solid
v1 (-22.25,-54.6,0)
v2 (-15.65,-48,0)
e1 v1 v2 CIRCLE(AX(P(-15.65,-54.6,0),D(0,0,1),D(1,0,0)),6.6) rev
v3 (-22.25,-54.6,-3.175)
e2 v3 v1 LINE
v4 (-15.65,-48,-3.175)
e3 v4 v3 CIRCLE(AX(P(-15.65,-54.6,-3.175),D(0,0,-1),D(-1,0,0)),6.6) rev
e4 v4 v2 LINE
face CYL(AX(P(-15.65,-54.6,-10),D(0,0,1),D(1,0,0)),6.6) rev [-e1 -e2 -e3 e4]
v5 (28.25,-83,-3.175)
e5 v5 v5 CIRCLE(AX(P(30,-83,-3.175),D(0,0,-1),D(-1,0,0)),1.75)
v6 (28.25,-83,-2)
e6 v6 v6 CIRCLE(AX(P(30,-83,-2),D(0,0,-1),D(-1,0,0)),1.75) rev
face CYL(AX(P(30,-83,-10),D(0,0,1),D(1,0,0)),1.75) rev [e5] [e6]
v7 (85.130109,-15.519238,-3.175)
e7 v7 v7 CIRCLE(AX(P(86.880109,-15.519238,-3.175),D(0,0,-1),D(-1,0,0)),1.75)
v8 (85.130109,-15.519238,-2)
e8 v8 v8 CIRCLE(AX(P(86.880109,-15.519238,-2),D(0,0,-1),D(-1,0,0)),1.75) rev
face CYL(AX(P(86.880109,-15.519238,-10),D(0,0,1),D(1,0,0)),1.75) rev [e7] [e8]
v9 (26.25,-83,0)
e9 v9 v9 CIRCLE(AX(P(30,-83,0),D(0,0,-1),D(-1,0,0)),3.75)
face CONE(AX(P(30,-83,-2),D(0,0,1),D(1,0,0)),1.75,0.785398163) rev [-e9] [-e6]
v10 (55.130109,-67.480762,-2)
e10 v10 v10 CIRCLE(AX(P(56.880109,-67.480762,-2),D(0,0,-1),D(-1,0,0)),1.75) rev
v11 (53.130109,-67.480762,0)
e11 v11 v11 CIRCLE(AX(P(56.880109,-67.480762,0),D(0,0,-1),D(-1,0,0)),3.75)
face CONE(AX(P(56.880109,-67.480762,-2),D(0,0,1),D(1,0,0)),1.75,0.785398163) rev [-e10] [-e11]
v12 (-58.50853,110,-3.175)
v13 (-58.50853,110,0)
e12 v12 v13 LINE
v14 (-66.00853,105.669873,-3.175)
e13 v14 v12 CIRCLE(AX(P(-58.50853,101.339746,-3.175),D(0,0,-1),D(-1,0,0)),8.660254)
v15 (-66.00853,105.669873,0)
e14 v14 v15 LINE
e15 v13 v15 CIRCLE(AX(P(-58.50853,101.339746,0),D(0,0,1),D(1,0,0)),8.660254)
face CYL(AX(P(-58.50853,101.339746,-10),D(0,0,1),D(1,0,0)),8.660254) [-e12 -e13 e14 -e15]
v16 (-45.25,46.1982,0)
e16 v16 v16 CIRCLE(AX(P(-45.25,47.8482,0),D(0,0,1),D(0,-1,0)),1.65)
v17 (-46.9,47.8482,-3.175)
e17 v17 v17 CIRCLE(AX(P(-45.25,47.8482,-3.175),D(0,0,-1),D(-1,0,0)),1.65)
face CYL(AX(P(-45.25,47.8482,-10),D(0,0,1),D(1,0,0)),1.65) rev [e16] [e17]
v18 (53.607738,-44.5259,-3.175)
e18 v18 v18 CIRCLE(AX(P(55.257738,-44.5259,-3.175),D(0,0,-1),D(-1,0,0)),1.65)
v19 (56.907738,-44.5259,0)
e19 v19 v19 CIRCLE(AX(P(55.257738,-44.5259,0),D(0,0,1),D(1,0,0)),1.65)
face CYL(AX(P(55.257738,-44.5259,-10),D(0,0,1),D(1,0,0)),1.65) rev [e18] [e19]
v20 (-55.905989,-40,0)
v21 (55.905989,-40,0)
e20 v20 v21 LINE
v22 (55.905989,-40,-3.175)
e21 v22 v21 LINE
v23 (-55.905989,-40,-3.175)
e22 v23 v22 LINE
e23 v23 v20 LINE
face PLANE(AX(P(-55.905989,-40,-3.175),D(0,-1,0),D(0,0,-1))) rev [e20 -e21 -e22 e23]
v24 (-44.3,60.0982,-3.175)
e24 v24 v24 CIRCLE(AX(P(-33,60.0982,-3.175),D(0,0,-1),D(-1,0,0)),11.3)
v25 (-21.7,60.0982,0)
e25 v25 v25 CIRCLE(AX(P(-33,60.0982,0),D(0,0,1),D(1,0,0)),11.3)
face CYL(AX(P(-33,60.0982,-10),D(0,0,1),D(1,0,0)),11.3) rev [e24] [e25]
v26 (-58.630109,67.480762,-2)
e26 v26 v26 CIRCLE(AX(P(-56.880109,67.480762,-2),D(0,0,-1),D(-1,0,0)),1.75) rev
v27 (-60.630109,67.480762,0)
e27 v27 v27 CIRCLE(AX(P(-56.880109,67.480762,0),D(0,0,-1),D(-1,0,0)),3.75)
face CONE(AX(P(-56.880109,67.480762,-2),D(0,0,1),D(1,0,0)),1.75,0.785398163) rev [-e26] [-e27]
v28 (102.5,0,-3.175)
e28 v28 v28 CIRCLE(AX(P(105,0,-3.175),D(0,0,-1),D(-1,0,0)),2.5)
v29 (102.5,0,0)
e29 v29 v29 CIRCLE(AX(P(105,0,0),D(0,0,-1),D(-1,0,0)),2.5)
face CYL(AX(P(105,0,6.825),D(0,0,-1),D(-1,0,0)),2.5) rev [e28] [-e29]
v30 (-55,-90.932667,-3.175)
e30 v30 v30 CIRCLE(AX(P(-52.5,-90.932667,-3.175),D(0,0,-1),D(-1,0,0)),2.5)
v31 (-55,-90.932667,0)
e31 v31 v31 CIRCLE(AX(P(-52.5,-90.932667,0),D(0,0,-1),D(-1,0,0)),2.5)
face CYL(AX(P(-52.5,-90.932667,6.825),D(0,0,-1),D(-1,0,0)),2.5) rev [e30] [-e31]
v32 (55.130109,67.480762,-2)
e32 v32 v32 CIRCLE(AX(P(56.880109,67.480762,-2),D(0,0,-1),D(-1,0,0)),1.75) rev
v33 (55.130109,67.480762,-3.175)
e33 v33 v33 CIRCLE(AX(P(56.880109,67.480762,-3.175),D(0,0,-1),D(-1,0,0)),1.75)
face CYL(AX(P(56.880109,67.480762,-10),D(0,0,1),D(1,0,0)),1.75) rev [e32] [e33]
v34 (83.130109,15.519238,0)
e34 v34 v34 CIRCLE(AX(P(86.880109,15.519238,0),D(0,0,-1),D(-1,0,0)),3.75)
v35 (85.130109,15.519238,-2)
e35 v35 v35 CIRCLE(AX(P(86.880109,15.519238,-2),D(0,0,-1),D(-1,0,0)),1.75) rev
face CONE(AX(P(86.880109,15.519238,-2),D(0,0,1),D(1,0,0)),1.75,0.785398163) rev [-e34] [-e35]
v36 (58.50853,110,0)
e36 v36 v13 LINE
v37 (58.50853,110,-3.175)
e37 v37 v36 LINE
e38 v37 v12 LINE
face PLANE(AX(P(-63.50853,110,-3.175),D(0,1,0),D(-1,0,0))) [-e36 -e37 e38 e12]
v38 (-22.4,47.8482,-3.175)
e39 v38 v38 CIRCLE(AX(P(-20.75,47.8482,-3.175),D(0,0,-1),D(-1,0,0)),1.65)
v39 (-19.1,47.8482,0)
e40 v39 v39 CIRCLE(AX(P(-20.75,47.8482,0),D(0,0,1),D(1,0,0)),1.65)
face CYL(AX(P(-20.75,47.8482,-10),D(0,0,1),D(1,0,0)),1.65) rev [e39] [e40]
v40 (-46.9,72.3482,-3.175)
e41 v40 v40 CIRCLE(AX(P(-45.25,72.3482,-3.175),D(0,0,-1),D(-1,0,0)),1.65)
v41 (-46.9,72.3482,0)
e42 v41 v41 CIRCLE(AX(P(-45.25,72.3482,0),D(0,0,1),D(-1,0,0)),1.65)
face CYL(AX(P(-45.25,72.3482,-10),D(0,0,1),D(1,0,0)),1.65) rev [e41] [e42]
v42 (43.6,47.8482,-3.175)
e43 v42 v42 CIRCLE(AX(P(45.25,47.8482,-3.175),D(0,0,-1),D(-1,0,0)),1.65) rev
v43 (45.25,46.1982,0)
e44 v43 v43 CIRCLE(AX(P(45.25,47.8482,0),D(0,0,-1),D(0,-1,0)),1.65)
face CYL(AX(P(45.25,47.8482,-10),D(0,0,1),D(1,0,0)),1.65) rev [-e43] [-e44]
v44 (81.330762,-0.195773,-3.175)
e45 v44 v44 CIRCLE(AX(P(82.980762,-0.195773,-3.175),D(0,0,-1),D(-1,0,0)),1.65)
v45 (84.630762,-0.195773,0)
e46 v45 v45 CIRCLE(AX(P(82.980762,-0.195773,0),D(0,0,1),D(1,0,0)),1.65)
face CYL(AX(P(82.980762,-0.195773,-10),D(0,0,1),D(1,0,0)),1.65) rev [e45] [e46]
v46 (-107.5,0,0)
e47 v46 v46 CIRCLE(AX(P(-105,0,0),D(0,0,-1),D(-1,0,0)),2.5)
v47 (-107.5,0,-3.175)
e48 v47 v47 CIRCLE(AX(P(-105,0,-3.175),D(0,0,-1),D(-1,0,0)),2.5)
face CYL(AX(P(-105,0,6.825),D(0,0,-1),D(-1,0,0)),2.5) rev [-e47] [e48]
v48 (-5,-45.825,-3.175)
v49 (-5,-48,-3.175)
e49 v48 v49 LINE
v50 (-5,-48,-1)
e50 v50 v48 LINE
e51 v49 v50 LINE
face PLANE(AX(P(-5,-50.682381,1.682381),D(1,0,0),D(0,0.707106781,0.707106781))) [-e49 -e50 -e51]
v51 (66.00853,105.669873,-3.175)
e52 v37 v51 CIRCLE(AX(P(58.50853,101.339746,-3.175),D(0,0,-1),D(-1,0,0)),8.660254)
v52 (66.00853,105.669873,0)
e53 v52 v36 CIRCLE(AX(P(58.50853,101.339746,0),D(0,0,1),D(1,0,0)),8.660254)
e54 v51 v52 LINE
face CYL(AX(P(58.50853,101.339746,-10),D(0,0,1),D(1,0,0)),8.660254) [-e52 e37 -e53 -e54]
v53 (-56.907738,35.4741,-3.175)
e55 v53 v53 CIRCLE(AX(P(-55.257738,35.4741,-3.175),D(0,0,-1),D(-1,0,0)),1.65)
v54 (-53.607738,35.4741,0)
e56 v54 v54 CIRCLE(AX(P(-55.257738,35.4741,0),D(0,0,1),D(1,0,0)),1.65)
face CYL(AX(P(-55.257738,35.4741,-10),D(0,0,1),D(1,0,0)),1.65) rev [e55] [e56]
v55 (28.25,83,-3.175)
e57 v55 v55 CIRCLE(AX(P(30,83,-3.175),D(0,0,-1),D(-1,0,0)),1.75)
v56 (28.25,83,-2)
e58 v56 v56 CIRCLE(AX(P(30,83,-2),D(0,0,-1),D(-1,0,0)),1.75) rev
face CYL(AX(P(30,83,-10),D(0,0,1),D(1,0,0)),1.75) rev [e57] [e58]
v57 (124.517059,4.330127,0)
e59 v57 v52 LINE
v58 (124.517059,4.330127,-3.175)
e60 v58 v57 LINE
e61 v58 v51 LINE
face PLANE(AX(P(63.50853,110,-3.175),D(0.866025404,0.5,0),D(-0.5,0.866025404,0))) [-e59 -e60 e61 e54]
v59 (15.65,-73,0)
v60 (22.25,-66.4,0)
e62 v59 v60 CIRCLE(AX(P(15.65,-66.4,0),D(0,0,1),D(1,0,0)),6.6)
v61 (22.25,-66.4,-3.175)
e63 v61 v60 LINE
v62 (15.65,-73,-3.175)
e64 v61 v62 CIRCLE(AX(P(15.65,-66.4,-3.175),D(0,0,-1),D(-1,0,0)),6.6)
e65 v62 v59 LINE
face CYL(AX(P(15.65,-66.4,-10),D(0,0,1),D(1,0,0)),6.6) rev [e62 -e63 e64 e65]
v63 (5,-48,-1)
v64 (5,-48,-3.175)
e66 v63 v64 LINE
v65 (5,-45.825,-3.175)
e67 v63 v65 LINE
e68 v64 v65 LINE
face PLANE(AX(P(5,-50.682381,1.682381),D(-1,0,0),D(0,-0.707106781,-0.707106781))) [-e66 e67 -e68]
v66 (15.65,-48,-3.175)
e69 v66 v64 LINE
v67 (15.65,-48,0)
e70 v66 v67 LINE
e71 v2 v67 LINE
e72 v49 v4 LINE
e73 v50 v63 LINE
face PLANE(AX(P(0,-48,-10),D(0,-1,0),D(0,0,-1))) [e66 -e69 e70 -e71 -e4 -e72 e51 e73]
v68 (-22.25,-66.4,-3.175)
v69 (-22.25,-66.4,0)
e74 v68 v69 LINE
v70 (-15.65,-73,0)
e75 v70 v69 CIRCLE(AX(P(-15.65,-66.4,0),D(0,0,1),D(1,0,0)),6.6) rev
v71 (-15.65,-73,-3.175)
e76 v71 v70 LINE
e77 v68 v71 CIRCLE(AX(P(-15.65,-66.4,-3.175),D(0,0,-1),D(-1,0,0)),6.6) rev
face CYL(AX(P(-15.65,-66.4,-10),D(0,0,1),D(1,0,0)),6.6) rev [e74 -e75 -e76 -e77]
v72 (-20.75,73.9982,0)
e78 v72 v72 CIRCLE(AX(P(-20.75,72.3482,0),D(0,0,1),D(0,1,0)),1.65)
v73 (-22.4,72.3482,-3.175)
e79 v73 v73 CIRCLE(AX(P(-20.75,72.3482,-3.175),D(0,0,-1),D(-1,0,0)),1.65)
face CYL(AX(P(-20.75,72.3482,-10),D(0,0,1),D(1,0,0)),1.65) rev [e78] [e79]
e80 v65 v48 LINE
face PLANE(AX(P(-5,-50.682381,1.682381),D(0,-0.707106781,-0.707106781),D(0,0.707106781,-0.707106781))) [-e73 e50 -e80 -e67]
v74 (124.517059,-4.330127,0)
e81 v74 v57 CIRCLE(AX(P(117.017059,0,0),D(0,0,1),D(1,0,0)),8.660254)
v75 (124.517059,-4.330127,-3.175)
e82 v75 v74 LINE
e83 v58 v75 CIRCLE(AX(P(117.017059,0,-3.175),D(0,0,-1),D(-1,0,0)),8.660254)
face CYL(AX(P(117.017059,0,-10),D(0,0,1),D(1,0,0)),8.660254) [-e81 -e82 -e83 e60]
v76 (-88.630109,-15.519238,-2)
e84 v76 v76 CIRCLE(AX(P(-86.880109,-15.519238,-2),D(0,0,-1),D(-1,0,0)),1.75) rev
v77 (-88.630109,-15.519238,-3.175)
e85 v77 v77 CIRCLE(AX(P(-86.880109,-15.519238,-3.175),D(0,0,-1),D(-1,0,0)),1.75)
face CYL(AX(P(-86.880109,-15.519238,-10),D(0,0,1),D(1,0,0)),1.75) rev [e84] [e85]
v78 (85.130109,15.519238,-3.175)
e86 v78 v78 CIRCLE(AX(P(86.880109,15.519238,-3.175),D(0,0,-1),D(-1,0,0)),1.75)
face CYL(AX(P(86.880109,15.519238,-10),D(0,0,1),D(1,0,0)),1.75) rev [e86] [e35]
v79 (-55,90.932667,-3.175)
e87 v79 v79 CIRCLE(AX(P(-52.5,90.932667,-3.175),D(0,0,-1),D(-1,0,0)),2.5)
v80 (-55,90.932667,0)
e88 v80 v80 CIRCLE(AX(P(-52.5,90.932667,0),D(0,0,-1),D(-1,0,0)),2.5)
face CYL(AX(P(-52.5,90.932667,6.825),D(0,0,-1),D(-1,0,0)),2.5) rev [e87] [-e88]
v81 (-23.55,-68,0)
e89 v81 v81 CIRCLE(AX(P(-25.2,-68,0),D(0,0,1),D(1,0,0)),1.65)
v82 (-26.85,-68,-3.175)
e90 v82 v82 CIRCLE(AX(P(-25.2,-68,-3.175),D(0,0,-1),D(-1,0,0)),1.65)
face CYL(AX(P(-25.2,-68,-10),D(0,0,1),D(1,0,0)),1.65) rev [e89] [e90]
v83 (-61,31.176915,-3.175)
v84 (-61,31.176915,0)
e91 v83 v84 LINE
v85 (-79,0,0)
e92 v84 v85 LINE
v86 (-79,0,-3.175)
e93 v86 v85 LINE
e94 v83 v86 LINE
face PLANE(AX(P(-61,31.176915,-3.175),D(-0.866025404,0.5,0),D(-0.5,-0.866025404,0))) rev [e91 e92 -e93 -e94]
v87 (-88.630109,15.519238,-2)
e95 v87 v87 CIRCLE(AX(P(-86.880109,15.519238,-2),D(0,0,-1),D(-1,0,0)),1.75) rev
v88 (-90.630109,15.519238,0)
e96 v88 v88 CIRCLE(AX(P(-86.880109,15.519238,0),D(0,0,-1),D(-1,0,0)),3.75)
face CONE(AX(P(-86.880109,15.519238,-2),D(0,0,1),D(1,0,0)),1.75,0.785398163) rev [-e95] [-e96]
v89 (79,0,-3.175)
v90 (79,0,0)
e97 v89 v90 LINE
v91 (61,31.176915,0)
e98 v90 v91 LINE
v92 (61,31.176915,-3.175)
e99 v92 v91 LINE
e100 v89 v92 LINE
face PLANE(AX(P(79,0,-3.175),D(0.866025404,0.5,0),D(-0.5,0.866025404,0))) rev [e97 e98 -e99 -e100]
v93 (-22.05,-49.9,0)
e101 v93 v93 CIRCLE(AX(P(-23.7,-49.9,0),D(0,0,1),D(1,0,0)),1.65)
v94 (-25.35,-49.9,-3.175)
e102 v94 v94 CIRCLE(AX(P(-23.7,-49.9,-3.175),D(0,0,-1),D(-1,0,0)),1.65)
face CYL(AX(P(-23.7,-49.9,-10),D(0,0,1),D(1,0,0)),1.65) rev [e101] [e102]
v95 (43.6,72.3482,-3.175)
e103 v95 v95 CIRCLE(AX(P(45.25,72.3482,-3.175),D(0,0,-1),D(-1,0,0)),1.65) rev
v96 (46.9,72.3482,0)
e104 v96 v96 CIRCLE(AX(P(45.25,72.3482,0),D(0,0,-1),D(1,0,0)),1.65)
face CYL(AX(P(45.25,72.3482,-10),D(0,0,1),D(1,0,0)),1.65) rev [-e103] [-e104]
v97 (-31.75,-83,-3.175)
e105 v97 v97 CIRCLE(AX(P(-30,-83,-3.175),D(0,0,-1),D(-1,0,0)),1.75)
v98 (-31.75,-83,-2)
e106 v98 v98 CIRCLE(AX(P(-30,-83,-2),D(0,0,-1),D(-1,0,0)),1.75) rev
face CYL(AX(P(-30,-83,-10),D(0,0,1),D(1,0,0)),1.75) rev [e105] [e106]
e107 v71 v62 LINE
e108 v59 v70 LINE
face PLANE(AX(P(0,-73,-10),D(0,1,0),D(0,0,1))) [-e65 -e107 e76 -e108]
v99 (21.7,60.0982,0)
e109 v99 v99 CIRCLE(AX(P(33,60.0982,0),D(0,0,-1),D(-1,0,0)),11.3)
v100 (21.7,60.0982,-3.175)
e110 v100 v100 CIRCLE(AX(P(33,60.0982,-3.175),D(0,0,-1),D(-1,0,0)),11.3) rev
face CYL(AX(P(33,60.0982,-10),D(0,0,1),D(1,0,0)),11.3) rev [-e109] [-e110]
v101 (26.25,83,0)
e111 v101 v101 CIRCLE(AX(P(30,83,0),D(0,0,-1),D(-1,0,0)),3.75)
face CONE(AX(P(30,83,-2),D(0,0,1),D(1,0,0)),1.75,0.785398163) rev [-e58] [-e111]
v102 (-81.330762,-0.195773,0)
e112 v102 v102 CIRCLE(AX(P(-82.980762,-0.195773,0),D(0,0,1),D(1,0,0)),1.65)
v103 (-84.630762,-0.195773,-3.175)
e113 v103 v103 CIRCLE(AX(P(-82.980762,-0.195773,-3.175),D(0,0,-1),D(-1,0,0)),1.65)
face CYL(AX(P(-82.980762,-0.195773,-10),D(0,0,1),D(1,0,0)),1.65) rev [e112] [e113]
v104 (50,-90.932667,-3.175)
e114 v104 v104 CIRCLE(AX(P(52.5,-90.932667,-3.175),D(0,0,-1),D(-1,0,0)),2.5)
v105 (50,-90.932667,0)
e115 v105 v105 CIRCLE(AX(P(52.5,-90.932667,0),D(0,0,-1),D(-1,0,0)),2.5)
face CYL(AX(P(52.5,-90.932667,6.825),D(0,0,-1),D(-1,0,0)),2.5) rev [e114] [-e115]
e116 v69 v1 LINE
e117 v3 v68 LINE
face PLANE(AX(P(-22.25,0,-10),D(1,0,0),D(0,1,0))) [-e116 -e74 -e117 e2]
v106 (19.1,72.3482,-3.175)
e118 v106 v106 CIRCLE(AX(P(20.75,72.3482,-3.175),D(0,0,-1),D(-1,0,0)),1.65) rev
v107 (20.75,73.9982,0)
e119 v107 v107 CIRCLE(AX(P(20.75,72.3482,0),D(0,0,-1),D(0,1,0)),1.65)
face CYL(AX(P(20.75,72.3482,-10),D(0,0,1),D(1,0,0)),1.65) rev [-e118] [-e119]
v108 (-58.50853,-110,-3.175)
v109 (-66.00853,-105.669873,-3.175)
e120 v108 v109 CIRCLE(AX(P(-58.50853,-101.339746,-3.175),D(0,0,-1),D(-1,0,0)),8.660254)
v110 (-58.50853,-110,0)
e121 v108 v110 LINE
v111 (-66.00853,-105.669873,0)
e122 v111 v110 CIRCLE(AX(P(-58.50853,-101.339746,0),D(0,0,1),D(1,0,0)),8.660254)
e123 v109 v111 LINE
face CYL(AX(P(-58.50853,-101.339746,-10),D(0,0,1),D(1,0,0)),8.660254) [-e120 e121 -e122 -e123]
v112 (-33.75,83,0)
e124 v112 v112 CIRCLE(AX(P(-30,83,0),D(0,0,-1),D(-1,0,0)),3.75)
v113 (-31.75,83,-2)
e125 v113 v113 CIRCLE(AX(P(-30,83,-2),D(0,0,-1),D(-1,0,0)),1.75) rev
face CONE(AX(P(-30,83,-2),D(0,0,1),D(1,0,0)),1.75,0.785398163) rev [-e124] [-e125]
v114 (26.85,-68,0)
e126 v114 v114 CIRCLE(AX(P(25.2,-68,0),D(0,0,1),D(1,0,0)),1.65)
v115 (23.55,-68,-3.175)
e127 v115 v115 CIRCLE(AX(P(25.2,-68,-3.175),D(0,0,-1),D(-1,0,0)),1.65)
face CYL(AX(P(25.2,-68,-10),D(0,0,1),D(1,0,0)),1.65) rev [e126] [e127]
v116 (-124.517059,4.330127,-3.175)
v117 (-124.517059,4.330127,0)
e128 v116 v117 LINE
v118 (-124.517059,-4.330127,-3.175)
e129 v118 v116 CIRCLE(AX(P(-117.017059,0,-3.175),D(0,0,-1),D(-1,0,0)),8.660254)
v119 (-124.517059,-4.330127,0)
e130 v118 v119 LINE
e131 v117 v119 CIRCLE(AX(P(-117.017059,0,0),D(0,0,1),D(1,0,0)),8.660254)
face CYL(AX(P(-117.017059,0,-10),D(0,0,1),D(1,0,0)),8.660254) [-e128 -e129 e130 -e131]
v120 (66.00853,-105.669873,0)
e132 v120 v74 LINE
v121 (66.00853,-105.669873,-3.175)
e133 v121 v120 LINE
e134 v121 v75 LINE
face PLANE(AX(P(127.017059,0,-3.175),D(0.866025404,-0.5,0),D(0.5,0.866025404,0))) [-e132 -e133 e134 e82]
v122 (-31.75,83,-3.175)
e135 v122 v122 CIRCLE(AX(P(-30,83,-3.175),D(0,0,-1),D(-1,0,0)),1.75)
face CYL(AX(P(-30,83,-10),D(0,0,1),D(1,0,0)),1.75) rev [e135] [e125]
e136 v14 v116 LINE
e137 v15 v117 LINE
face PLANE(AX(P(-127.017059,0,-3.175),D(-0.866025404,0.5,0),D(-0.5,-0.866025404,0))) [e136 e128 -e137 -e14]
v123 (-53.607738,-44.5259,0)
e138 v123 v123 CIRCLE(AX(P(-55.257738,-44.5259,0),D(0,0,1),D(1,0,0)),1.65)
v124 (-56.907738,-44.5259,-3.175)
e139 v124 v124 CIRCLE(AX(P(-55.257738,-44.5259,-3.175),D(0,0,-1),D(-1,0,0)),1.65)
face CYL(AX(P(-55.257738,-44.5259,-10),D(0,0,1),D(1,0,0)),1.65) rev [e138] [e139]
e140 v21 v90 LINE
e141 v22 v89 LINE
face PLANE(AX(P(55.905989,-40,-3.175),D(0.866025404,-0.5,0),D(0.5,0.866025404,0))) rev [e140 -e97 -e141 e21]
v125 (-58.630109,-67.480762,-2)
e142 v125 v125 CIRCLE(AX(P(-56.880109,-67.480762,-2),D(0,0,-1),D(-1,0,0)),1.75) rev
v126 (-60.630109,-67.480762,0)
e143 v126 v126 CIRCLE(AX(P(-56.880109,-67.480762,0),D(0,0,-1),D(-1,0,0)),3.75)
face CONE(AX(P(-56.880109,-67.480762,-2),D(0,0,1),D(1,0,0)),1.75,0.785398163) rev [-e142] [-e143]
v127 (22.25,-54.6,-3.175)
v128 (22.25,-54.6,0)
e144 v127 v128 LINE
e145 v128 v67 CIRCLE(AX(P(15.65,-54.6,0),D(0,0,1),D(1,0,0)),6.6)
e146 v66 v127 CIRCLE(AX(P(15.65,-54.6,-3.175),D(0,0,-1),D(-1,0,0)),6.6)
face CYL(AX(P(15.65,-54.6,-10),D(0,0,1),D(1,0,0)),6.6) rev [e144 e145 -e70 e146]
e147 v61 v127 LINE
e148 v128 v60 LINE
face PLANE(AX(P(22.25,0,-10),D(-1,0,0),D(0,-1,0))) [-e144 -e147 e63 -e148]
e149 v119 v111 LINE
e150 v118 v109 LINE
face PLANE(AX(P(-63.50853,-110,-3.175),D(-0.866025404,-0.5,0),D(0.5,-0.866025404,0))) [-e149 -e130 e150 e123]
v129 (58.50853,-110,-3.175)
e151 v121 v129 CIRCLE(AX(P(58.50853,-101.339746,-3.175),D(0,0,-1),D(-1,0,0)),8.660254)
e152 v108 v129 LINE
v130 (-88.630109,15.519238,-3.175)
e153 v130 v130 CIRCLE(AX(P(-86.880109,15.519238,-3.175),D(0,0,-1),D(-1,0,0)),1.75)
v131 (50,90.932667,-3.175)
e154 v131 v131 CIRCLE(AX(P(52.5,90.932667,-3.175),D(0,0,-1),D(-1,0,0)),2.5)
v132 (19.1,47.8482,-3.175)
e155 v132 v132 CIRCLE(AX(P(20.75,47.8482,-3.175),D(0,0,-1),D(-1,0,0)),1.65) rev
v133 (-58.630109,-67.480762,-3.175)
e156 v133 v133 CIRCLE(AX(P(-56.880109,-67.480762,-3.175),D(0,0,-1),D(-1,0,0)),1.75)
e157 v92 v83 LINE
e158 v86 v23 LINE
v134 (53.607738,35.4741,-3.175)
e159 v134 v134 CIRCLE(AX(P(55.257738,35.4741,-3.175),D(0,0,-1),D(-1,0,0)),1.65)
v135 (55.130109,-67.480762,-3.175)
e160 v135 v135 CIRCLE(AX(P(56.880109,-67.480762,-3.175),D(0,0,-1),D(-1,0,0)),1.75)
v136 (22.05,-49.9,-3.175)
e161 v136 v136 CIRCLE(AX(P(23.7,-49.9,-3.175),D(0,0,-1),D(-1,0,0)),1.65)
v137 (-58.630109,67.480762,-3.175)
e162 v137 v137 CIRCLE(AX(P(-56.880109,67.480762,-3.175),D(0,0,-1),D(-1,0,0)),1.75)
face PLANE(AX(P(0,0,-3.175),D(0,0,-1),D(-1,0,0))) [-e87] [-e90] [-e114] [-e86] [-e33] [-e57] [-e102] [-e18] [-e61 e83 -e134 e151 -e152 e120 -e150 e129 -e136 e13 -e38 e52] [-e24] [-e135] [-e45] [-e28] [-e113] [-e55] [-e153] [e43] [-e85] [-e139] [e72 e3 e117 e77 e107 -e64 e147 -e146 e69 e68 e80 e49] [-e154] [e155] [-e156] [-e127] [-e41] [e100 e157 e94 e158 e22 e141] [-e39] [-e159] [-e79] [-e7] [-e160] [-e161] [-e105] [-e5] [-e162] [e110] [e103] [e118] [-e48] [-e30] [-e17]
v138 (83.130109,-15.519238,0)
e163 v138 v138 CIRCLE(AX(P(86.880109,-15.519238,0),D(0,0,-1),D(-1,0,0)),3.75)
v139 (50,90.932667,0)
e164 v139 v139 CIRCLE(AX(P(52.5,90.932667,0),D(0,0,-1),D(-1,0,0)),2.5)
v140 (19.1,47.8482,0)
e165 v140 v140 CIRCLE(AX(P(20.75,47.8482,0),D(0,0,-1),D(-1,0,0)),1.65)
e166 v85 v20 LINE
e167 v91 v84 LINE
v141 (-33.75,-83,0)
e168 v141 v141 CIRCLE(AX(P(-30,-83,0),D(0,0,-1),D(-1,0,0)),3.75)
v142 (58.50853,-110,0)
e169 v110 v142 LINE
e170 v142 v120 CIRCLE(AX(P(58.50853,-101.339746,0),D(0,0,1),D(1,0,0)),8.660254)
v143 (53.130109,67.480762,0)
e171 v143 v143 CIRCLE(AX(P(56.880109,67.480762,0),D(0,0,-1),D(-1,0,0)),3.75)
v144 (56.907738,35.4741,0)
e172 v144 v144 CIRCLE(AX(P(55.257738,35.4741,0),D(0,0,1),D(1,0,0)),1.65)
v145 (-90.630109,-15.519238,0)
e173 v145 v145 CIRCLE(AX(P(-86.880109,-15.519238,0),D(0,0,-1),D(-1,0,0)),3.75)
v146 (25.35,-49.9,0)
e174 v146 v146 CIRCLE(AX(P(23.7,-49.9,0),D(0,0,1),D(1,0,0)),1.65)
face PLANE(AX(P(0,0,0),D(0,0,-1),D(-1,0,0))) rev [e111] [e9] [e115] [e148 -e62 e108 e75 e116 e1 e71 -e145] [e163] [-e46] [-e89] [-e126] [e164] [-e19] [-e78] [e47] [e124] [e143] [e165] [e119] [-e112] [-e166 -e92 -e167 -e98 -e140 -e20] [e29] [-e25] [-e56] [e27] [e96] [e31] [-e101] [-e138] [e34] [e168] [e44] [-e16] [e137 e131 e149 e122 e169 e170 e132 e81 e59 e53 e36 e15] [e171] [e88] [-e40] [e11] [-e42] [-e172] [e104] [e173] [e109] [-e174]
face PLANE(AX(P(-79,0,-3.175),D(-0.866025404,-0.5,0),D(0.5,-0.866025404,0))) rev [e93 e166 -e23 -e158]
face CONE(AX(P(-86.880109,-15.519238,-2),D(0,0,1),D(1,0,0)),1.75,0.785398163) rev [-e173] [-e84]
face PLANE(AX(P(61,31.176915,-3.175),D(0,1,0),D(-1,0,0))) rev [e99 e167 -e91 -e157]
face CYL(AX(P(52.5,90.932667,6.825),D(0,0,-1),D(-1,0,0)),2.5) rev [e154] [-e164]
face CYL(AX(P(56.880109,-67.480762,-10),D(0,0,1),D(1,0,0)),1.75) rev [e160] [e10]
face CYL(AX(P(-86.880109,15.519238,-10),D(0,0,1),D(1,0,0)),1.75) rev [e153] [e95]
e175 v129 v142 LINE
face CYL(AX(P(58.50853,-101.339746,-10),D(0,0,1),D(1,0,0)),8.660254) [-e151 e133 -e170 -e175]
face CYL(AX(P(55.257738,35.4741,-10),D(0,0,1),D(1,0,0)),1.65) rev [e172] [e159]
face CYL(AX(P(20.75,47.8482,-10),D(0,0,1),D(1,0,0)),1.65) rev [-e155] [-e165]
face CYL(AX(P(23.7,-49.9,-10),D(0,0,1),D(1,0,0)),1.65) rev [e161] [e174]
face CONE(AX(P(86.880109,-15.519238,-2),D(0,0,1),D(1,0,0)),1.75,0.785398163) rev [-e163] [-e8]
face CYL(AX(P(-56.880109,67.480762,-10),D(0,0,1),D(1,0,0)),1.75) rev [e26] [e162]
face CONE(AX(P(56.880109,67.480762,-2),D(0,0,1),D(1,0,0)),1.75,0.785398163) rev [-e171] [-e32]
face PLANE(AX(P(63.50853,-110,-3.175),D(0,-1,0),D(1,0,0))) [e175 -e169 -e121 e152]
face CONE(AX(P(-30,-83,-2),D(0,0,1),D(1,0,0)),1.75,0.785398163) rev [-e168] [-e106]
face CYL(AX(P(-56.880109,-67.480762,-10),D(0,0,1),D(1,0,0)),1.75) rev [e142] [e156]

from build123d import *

# Parameters (mm, degrees)
FLANGE_BASE1_DEPTH               = 3.175
ESBO_O6_R                        = 1.65
CORTE_EXTRUS_O1_DEPTH            = 10
ESBO_O8_R                        = 11.3
ESBO_O8_R_2                      = 1.65
CORTE_EXTRUS_O3_DEPTH            = 10
PADR_OCIRCULAR1_COUNT            = 4
ESBO_O7_R                        = 1.75
CORTE_EXTRUS_O2_DEPTH            = 10
CHANFRO1_SIZE                    = 2
PADR_OCIRCULAR2_COUNT            = 6
CHANFRO1_OF_PADR_OCIRCULAR2_SIZE = 2
ESPELHAR1_COPY_1_SKETCH_R        = 11.3
ESPELHAR1_COPY_1_SKETCH_R_2      = 1.65
ESPELHAR1_COPY_1_DEPTH           = 10
ESPELHAR1_COPY_2_SKETCH_R        = 11.3
ESPELHAR1_COPY_2_SKETCH_R_2      = 1.65
ESPELHAR1_COPY_2_DEPTH           = 10
ESPELHAR1_COPY_3_SKETCH_R        = 11.3
ESPELHAR1_COPY_3_SKETCH_R_2      = 1.65
ESPELHAR1_COPY_3_DEPTH           = 10
ESBO_O11_R                       = 2.5
CORTE_EXTRUS_O5_DEPTH            = 10
ESBO_O12_R                       = 1.65
CORTE_EXTRUS_O6_DEPTH            = 10
ESBO_O13_W                       = 376.359651272
ESBO_O13_H                       = 358.929615965
CORTE_EXTRUS_O7_DEPTH            = 10
CAVIDADE1_START                  = -5
CAVIDADE1_DEPTH                  = 10


# Read off the part's stored shape, not the designer's step: Cavidade1
# Sheet-metal steps are written as plain solids
with BuildPart() as part:
    # Esboço1 → Flange-base1 (new body)
    with BuildSketch(Plane.XY):
        Polygon((63.508529611, 110), (127.017059222, 0), (63.508529611, -110), (-63.508529611, -110), (-127.017059222, 0), (-63.508529611, 110), align=None)
        Polygon((61, 31.176914536), (-61, 31.176914536), (-79, 0), (-55.905989232, -40), (55.905989232, -40), (79, 0), align=None, mode=Mode.SUBTRACT)
    extrude(amount=-FLANGE_BASE1_DEPTH)

    # Esboço6 → Corte-extrusão1 (cut)
    with BuildSketch(Plane.XY):
        with BuildLine():
            Line((15.65, -73), (-15.65, -73))
            ThreePointArc((-15.65, -73), (-20.316904756, -71.066904756), (-22.25, -66.4))
            Line((-22.25, -66.4), (-22.25, -54.6))
            ThreePointArc((-22.25, -54.6), (-20.316904756, -49.933095244), (-15.65, -48))
            Line((-15.65, -48), (15.65, -48))
            ThreePointArc((15.65, -48), (20.316904756, -49.933095244), (22.25, -54.6))
            Line((22.25, -54.6), (22.25, -66.4))
            ThreePointArc((22.25, -66.4), (20.316904756, -71.066904756), (15.65, -73))
        make_face()
        with Locations((-23.7, -49.9)):
            Circle(ESBO_O6_R)
        with Locations((23.7, -49.9)):
            Circle(ESBO_O6_R)
        with Locations((25.2, -68)):
            Circle(ESBO_O6_R)
        with Locations((-25.2, -68)):
            Circle(ESBO_O6_R)
    extrude(amount=-CORTE_EXTRUS_O1_DEPTH, mode=Mode.SUBTRACT)

    # Esboço8 → Corte-extrusão3 (cut)
    with BuildSketch(Plane.XY):
        with Locations((-33, 60.0982)):
            Circle(ESBO_O8_R)
        with Locations((-20.75, 47.8482)):
            Circle(ESBO_O8_R_2)
    corte_extrus_o3 = extrude(amount=-CORTE_EXTRUS_O3_DEPTH, mode=Mode.SUBTRACT)

    # PadrãoCircular1: Corte-extrusão3 ×4 about axis
    padr_ocircular1_axis = Axis((-33, 60.0982, 0), (0, 0, 1))
    for i in range(1, PADR_OCIRCULAR1_COUNT):
        add(corte_extrus_o3.rotate(padr_ocircular1_axis, i * 360 / PADR_OCIRCULAR1_COUNT), mode=Mode.SUBTRACT)

    # Esboço7 → Corte-extrusão2 (cut)
    with BuildSketch(Plane.XY):
        with Locations((-30, -83)):
            Circle(ESBO_O7_R)
        with Locations((30, -83)):
            Circle(ESBO_O7_R)
    corte_extrus_o2 = extrude(amount=-CORTE_EXTRUS_O2_DEPTH, mode=Mode.SUBTRACT)

    # Chanfro1
    chanfro1_edges = [part.edges().sort_by_distance(p)[0] for p in [
        (-31.75, -83, 0),
        (28.25, -83, 0),
    ]]
    chamfer(chanfro1_edges, length=CHANFRO1_SIZE)

    # PadrãoCircular2: Corte-extrusão2 ×6 about axis
    padr_ocircular2_axis = Axis((0, 0, 0), (0, 0, 1))
    for i in range(1, PADR_OCIRCULAR2_COUNT):
        add(corte_extrus_o2.rotate(padr_ocircular2_axis, i * 360 / PADR_OCIRCULAR2_COUNT), mode=Mode.SUBTRACT)

    # Chanfro1 of PadrãoCircular2
    chanfro1_of_padr_ocircular2_edges = [part.edges().sort_by_distance(p)[0] for p in [
        (56.005108514, -68.99630657, 0),
        (86.005108514, -17.034782343, 0),
        (87.755108514, 14.00369343, 0),
        (57.755108514, 65.965217657, 0),
        (31.75, 83, 0),
        (-28.25, 83, 0),
        (-56.005108514, 68.99630657, 0),
        (-86.005108514, 17.034782343, 0),
        (-87.755108514, -14.00369343, 0),
        (-57.755108514, -65.965217657, 0),
    ]]
    chamfer(chanfro1_of_padr_ocircular2_edges, length=CHANFRO1_OF_PADR_OCIRCULAR2_SIZE)

    # Espelhar1: Corte-extrusão3 across plane
    add(corte_extrus_o3.mirror(Plane(origin=(0, 0, 0), x_dir=(0, 0, 1), z_dir=(1, 0, 0))), mode=Mode.SUBTRACT)

    # Espelhar1 copy 1 sketch → Espelhar1 copy 1 (cut)
    with BuildSketch(Plane(origin=(-27.0982, 93.0982, 0), x_dir=(0, 1, 0), z_dir=(0, 0, 1))):
        with Locations((-33, -60.0982)):
            Circle(ESPELHAR1_COPY_1_SKETCH_R)
        with Locations((-20.75, -47.8482)):
            Circle(ESPELHAR1_COPY_1_SKETCH_R_2)
    extrude(amount=-ESPELHAR1_COPY_1_DEPTH, mode=Mode.SUBTRACT)

    # Espelhar1 copy 2 sketch → Espelhar1 copy 2 (cut)
    with BuildSketch(Plane(origin=(66, 120.1964, 0), x_dir=(1, 0, 0), z_dir=(0, 0, 1))):
        with Locations((-33, -60.0982)):
            Circle(ESPELHAR1_COPY_2_SKETCH_R)
        with Locations((-20.75, -47.8482)):
            Circle(ESPELHAR1_COPY_2_SKETCH_R_2)
    extrude(amount=-ESPELHAR1_COPY_2_DEPTH, mode=Mode.SUBTRACT)

    # Espelhar1 copy 3 sketch → Espelhar1 copy 3 (cut)
    with BuildSketch(Plane(origin=(93.0982, 27.0982, 0), x_dir=(0, -1, 0), z_dir=(0, 0, 1))):
        with Locations((-33, -60.0982)):
            Circle(ESPELHAR1_COPY_3_SKETCH_R)
        with Locations((-20.75, -47.8482)):
            Circle(ESPELHAR1_COPY_3_SKETCH_R_2)
    extrude(amount=-ESPELHAR1_COPY_3_DEPTH, mode=Mode.SUBTRACT)

    # Esboço11 → Corte-extrusão5 (cut)
    with BuildSketch(Plane(origin=(0, 0, -3.175), x_dir=(-1, 0, 0), z_dir=(0, 0, -1))):
        with Locations((-52.5, 90.932667397)):
            Circle(ESBO_O11_R)
        with Locations((-105, 0)):
            Circle(ESBO_O11_R)
        with Locations((52.5, 90.932667397)):
            Circle(ESBO_O11_R)
        with Locations((105, 0)):
            Circle(ESBO_O11_R)
        with Locations((52.5, -90.932667397)):
            Circle(ESBO_O11_R)
        with Locations((-52.5, -90.932667397)):
            Circle(ESBO_O11_R)
    extrude(amount=-CORTE_EXTRUS_O5_DEPTH, mode=Mode.SUBTRACT)

    # Esboço12 → Corte-extrusão6 (cut)
    with BuildSketch(Plane.XY):
        with Locations((-55.257737945, -44.5259)):
            Circle(ESBO_O12_R)
        with Locations((-82.980762114, -0.195772981)):
            Circle(ESBO_O12_R)
        with Locations((-55.257737945, 35.4741)):
            Circle(ESBO_O12_R)
        with Locations((55.257737945, 35.4741)):
            Circle(ESBO_O12_R)
        with Locations((82.980762114, -0.195772981)):
            Circle(ESBO_O12_R)
        with Locations((55.257737945, -44.5259)):
            Circle(ESBO_O12_R)
    extrude(amount=-CORTE_EXTRUS_O6_DEPTH, mode=Mode.SUBTRACT)

    # Esboço13 → Corte-extrusão7 (cut)
    with BuildSketch(Plane.XY):
        with Locations((17.92855311, -8.326549872)):
            Rectangle(ESBO_O13_W, ESBO_O13_H)
        with BuildLine():
            Line((-66.008529611, 105.669872981), (-124.517059222, 4.330127019))
            ThreePointArc((-124.517059222, 4.330127019), (-125.67731326, 0), (-124.517059222, -4.330127019))
            Line((-124.517059222, -4.330127019), (-66.008529611, -105.669872981))
            ThreePointArc((-66.008529611, -105.669872981), (-62.83865663, -108.839745962), (-58.508529611, -110))
            Line((-58.508529611, -110), (58.508529611, -110))
            ThreePointArc((58.508529611, -110), (62.83865663, -108.839745962), (66.008529611, -105.669872981))
            Line((66.008529611, -105.669872981), (124.517059222, -4.330127019))
            ThreePointArc((124.517059222, -4.330127019), (125.67731326, 0), (124.517059222, 4.330127019))
            Line((124.517059222, 4.330127019), (66.008529611, 105.669872981))
            ThreePointArc((66.008529611, 105.669872981), (62.83865663, 108.839745962), (58.508529611, 110))
            Line((58.508529611, 110), (-58.508529611, 110))
            ThreePointArc((-58.508529611, 110), (-62.83865663, 108.839745962), (-66.008529611, 105.669872981))
        make_face(mode=Mode.SUBTRACT)
    extrude(amount=-CORTE_EXTRUS_O7_DEPTH, mode=Mode.SUBTRACT)

    # Cavidade1 outline → Cavidade1 (cut)
    with BuildSketch(Plane.YZ.offset(CAVIDADE1_START)):
        Polygon((-45.825, -3.175), (-48, -1), (-48, -3.175), align=None)
    extrude(amount=CAVIDADE1_DEPTH, mode=Mode.SUBTRACT)


solid = part.part
